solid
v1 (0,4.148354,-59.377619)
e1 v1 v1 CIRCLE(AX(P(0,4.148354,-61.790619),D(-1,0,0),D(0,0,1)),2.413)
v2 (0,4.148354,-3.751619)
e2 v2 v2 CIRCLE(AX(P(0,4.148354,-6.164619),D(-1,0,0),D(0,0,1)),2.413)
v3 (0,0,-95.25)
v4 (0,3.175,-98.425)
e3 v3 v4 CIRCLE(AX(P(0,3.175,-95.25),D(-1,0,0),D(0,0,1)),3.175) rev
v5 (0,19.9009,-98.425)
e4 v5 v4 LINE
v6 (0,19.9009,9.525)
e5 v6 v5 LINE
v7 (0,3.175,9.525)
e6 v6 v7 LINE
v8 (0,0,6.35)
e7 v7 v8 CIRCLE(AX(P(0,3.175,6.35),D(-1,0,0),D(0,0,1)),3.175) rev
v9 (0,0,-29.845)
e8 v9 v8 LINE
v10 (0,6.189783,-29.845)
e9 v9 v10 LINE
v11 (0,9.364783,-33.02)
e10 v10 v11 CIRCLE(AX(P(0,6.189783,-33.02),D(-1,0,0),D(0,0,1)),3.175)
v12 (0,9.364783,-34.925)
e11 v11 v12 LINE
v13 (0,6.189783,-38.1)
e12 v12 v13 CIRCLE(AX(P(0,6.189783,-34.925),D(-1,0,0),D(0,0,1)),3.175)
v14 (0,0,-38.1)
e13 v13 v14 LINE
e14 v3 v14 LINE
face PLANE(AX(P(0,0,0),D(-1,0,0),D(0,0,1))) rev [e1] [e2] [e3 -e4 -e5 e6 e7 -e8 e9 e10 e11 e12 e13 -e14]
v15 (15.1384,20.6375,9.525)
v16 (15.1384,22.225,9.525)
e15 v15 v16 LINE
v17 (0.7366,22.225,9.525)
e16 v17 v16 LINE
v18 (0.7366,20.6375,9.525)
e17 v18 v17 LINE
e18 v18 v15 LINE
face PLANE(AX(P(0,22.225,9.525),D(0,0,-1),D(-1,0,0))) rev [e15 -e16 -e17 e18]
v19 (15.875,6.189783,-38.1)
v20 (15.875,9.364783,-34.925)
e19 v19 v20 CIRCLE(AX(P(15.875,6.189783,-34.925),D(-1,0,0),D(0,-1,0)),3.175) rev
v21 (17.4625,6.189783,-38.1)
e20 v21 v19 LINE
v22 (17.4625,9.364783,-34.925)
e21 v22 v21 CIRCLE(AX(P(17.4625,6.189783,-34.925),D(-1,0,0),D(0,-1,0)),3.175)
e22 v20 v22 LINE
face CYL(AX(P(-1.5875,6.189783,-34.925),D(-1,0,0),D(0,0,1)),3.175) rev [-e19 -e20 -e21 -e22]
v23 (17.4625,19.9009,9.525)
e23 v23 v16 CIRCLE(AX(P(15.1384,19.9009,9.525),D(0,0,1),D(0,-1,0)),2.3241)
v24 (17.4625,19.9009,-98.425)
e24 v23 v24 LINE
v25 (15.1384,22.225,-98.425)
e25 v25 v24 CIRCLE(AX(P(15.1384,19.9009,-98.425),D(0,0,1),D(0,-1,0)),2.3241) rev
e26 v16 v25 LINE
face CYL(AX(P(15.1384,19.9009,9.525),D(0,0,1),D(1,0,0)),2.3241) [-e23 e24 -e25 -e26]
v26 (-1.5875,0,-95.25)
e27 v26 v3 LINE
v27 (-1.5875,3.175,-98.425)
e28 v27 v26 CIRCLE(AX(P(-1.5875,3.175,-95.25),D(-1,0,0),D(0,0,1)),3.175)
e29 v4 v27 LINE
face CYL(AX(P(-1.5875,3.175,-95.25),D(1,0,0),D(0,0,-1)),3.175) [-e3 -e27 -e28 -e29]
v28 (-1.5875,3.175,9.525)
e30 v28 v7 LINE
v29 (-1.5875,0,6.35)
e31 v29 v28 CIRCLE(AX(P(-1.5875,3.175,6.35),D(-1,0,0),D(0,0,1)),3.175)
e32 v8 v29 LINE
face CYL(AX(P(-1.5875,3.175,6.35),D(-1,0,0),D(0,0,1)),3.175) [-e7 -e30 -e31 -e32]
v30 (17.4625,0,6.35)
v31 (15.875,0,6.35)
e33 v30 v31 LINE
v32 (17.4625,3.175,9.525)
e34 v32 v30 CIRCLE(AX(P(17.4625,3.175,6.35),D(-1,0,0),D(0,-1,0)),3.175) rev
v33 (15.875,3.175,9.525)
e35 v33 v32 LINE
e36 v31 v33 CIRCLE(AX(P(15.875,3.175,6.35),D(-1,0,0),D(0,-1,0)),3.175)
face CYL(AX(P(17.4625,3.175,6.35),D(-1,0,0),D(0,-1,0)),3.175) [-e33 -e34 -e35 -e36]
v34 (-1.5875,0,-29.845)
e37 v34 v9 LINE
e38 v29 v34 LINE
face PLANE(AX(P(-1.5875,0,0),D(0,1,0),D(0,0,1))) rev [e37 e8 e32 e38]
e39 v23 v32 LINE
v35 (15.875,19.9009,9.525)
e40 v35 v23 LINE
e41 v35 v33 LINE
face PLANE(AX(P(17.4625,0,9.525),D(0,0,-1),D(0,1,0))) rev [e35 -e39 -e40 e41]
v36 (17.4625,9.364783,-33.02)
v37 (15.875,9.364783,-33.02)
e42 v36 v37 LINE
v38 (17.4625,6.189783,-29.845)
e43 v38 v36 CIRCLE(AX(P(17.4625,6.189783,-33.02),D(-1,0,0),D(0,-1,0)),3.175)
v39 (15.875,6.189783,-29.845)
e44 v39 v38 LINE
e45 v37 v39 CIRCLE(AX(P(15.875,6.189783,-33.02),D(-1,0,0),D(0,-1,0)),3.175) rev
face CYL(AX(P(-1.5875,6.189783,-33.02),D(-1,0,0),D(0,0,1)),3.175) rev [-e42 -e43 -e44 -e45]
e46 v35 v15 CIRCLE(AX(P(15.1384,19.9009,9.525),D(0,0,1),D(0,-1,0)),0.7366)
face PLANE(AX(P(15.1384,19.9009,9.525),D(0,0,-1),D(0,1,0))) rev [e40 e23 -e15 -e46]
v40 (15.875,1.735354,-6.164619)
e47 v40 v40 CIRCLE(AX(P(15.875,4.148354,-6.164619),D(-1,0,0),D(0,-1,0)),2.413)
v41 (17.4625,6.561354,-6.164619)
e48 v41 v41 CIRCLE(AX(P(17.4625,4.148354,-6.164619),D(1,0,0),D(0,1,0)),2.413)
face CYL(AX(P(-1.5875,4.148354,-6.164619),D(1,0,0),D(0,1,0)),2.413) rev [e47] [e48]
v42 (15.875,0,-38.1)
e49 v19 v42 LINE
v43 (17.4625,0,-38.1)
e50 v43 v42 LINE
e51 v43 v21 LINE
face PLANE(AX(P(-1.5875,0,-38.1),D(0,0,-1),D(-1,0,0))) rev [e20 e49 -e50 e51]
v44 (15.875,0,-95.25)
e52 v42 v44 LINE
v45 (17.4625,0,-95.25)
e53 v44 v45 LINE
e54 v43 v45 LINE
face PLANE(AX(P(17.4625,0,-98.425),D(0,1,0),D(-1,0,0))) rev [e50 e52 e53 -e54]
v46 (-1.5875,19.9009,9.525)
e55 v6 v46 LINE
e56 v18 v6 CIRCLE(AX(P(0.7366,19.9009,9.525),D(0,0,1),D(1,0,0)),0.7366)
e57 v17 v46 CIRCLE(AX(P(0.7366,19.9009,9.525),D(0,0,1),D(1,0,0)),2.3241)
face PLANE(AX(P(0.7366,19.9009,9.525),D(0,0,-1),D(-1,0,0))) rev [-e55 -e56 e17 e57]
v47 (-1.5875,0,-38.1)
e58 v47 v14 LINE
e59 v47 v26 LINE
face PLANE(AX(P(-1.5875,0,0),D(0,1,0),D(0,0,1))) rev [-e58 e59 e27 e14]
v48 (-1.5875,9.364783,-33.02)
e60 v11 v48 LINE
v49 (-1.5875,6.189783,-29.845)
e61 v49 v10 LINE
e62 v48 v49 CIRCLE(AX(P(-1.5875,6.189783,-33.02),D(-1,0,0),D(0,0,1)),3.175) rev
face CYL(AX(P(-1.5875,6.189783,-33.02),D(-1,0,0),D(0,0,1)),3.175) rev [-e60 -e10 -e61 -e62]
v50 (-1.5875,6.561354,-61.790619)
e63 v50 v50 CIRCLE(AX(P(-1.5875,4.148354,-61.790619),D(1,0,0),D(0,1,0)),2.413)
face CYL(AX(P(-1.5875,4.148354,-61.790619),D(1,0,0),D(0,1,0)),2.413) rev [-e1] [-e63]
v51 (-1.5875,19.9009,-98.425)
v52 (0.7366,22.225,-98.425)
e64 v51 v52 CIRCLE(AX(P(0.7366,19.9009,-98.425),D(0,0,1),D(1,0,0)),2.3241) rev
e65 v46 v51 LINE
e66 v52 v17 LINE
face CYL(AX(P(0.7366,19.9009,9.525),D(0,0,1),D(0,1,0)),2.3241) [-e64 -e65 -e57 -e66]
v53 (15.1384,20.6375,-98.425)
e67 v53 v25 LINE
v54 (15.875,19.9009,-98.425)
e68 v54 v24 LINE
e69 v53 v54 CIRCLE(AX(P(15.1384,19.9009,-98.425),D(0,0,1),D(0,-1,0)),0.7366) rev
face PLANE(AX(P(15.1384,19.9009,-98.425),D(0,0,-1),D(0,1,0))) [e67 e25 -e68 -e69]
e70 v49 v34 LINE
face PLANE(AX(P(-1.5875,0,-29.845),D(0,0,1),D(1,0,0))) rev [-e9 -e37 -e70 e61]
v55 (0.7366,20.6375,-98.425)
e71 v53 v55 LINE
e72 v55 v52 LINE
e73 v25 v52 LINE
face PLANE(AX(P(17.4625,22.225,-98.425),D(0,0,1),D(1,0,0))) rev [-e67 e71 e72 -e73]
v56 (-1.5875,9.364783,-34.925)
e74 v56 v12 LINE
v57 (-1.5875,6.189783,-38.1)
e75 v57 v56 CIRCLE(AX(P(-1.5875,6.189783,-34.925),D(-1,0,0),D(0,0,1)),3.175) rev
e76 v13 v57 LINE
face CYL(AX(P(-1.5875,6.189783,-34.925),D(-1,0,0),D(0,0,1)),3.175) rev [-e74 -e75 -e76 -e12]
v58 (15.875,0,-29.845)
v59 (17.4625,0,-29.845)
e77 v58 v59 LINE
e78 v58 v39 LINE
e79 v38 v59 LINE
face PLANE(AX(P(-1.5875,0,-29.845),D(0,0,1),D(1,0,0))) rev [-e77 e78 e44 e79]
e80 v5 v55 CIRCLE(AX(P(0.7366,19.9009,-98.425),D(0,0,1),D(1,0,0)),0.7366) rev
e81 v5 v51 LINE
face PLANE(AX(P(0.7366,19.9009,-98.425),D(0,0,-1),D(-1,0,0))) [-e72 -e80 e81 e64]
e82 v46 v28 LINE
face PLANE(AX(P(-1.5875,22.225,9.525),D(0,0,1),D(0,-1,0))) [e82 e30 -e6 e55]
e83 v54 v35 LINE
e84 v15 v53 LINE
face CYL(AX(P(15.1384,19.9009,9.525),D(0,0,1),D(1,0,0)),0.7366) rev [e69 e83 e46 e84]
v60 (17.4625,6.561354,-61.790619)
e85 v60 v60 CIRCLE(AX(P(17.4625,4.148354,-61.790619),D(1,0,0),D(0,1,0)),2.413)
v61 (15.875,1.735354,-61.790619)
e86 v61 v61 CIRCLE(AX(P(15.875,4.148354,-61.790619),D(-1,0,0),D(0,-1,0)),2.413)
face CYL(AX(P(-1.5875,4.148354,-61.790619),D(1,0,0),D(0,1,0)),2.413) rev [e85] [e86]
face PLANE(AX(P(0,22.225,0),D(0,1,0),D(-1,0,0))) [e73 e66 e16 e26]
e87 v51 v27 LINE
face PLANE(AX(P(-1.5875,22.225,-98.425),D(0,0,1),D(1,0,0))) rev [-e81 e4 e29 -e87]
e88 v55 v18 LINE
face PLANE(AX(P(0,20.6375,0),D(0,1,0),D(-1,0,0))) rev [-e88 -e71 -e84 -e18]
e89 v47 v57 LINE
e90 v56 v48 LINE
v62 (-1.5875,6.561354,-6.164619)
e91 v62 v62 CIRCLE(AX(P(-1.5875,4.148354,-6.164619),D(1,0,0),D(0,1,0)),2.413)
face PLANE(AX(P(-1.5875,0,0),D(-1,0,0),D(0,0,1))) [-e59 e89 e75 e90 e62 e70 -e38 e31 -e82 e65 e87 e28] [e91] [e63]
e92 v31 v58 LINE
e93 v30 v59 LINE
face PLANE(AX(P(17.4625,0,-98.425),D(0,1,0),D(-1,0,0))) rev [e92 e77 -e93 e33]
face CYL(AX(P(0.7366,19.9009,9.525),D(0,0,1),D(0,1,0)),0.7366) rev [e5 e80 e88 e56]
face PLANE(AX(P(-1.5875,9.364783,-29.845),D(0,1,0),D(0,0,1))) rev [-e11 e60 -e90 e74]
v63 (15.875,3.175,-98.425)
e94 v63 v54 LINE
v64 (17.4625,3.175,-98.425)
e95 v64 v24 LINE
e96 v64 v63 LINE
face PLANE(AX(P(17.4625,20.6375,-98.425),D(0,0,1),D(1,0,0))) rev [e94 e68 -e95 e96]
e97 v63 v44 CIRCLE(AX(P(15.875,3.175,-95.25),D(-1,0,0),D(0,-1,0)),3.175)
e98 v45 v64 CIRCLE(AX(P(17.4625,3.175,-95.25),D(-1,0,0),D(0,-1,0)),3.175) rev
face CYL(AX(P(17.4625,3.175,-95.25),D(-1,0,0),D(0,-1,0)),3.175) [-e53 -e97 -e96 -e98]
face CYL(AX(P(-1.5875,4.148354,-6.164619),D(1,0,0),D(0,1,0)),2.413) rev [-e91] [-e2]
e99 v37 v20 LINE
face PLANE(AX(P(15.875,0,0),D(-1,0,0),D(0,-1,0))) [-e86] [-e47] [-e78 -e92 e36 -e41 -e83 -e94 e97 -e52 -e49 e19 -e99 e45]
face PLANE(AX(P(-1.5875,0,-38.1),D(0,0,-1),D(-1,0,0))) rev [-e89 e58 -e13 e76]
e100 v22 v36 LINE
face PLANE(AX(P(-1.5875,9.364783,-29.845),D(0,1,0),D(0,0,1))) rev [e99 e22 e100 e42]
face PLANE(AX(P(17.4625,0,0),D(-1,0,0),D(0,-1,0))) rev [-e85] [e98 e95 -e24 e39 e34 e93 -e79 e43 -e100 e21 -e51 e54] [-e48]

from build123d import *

# Parameters (mm, degrees)
BASE_FLANGE1_DEPTH           = 1.5875
EDGE_FLANGE1_STRIP_W         = 7.8232
EDGE_FLANGE1_STRIP_H         = 1.5875
EDGE_FLANGE1_STRIP_CUT_DEPTH = 107.95
EDGE_FLANGE1_DEPTH           = 107.95
EDGE_FLANGE2_STRIP_W         = 7.8232
EDGE_FLANGE2_STRIP_H         = 1.5875
EDGE_FLANGE2_STRIP_CUT_DEPTH = 107.95
EDGE_FLANGE2_DEPTH           = 107.95
HOLE1_START                  = -1.5875
HOLE1_OUTLINE_R              = 2.413
HOLE1_DEPTH                  = 19.05
CUT_EXTRUDE1_DEPTH           = 103.402979235
CUT_EXTRUDE1_DEPTH_BACK      = 103.402979235
SKETCH27_W                   = 8.255
SKETCH27_H                   = 9.364783331
FILLET1_R                    = 3.175


# Read off the part's stored shape, not the designer's step: Hole1
# Sheet-metal steps are written as plain solids
with BuildPart() as part:
    # Sketch1 → Base-Flange1 (new body)
    with BuildSketch(Plane(origin=(0, 0, 0), x_dir=(0, 0, -1), z_dir=(1, 0, 0))):
        Polygon((0, 0), (88.9, 0), (98.425, 0), (98.425, 22.225), (88.9, 22.225), (0, 22.225), (-9.525, 22.225), (-9.525, 0), align=None)
    extrude(amount=-BASE_FLANGE1_DEPTH)

    # Edge-Flange1 strip (across the edge) → Edge-Flange1 strip cut (cut)
    with BuildSketch(Plane(origin=(0, 22.225, -98.425), x_dir=(0, -1, 0), z_dir=(0, 0, 1))):
        with Locations((-1.5875, -0.79375)):
            Rectangle(EDGE_FLANGE1_STRIP_W, EDGE_FLANGE1_STRIP_H)
    extrude(amount=EDGE_FLANGE1_STRIP_CUT_DEPTH, mode=Mode.SUBTRACT)

    # Edge-Flange1 section (across the edge) → Edge-Flange1 (add)
    with BuildSketch(Plane(origin=(0, 22.225, -98.425), x_dir=(0, -1, 0), z_dir=(0, 0, 1))):
        with BuildLine():
            Line((0, 0.7366), (0, 17.4625))
            Line((0, 17.4625), (1.5875, 17.4625))
            Line((1.5875, 17.4625), (1.5875, 0.7366))
            ThreePointArc((1.5875, 0.7366), (1.803245145, 0.215745145), (2.3241, 0))
            Line((2.3241, 0), (2.3241, -1.5875))
            ThreePointArc((2.3241, -1.5875), (0.68071313, -0.90678687), (0, 0.7366))
        make_face()
    extrude(amount=EDGE_FLANGE1_DEPTH)

    # Edge-Flange2 strip (across the edge) → Edge-Flange2 strip cut (cut)
    with BuildSketch(Plane(origin=(17.4625, 20.6375, -98.425), x_dir=(-1, 0, 0), z_dir=(0, 0, 1))):
        with Locations((-1.5875, -0.79375)):
            Rectangle(EDGE_FLANGE2_STRIP_W, EDGE_FLANGE2_STRIP_H)
    extrude(amount=EDGE_FLANGE2_STRIP_CUT_DEPTH, mode=Mode.SUBTRACT)

    # Edge-Flange2 section (across the edge) → Edge-Flange2 (add)
    with BuildSketch(Plane(origin=(17.4625, 20.6375, -98.425), x_dir=(-1, 0, 0), z_dir=(0, 0, 1))):
        with BuildLine():
            Line((0, 0.7366), (0, 20.6375))
            Line((0, 20.6375), (1.5875, 20.6375))
            Line((1.5875, 20.6375), (1.5875, 0.7366))
            ThreePointArc((1.5875, 0.7366), (1.803245145, 0.215745145), (2.3241, 0))
            Line((2.3241, 0), (2.3241, -1.5875))
            ThreePointArc((2.3241, -1.5875), (0.68071313, -0.90678687), (0, 0.7366))
        make_face()
    extrude(amount=EDGE_FLANGE2_DEPTH)

    # Hole1 outline → Hole1 (cut)
    with BuildSketch(Plane.YZ.offset(HOLE1_START)):
        with Locations((4.148353843, -61.790618702)):
            Circle(HOLE1_OUTLINE_R)
        with Locations((4.148353843, -6.164618702)):
            Circle(HOLE1_OUTLINE_R)
    extrude(amount=HOLE1_DEPTH, mode=Mode.SUBTRACT)

    # Sketch27 → Cut-Extrude1 (cut, two sides: drawn at the far end of the back side and taken through both)
    with BuildSketch(Plane(origin=(0, 0, 0), x_dir=(0, 0, -1), z_dir=(1, 0, 0)).offset(-CUT_EXTRUDE1_DEPTH_BACK)):
        with Locations((33.9725, 4.682391665)):
            Rectangle(SKETCH27_W, SKETCH27_H)
    extrude(amount=CUT_EXTRUDE1_DEPTH + CUT_EXTRUDE1_DEPTH_BACK, mode=Mode.SUBTRACT)

    # Fillet1
    fillet1_edges = [part.edges().sort_by_distance(p)[0] for p in [
        (-0.79375, 9.364783331, -29.845),
        (-0.79375, 9.364783331, -38.1),
        (16.66875, 9.364783331, -29.845),
        (16.66875, 9.364783331, -38.1),
        (-0.79375, 0, 9.525),
        (-0.79375, 0, -98.425),
        (16.66875, 0, -98.425),
        (16.66875, 0, 9.525),
    ]]
    fillet(fillet1_edges, radius=FILLET1_R)


solid = part.part
